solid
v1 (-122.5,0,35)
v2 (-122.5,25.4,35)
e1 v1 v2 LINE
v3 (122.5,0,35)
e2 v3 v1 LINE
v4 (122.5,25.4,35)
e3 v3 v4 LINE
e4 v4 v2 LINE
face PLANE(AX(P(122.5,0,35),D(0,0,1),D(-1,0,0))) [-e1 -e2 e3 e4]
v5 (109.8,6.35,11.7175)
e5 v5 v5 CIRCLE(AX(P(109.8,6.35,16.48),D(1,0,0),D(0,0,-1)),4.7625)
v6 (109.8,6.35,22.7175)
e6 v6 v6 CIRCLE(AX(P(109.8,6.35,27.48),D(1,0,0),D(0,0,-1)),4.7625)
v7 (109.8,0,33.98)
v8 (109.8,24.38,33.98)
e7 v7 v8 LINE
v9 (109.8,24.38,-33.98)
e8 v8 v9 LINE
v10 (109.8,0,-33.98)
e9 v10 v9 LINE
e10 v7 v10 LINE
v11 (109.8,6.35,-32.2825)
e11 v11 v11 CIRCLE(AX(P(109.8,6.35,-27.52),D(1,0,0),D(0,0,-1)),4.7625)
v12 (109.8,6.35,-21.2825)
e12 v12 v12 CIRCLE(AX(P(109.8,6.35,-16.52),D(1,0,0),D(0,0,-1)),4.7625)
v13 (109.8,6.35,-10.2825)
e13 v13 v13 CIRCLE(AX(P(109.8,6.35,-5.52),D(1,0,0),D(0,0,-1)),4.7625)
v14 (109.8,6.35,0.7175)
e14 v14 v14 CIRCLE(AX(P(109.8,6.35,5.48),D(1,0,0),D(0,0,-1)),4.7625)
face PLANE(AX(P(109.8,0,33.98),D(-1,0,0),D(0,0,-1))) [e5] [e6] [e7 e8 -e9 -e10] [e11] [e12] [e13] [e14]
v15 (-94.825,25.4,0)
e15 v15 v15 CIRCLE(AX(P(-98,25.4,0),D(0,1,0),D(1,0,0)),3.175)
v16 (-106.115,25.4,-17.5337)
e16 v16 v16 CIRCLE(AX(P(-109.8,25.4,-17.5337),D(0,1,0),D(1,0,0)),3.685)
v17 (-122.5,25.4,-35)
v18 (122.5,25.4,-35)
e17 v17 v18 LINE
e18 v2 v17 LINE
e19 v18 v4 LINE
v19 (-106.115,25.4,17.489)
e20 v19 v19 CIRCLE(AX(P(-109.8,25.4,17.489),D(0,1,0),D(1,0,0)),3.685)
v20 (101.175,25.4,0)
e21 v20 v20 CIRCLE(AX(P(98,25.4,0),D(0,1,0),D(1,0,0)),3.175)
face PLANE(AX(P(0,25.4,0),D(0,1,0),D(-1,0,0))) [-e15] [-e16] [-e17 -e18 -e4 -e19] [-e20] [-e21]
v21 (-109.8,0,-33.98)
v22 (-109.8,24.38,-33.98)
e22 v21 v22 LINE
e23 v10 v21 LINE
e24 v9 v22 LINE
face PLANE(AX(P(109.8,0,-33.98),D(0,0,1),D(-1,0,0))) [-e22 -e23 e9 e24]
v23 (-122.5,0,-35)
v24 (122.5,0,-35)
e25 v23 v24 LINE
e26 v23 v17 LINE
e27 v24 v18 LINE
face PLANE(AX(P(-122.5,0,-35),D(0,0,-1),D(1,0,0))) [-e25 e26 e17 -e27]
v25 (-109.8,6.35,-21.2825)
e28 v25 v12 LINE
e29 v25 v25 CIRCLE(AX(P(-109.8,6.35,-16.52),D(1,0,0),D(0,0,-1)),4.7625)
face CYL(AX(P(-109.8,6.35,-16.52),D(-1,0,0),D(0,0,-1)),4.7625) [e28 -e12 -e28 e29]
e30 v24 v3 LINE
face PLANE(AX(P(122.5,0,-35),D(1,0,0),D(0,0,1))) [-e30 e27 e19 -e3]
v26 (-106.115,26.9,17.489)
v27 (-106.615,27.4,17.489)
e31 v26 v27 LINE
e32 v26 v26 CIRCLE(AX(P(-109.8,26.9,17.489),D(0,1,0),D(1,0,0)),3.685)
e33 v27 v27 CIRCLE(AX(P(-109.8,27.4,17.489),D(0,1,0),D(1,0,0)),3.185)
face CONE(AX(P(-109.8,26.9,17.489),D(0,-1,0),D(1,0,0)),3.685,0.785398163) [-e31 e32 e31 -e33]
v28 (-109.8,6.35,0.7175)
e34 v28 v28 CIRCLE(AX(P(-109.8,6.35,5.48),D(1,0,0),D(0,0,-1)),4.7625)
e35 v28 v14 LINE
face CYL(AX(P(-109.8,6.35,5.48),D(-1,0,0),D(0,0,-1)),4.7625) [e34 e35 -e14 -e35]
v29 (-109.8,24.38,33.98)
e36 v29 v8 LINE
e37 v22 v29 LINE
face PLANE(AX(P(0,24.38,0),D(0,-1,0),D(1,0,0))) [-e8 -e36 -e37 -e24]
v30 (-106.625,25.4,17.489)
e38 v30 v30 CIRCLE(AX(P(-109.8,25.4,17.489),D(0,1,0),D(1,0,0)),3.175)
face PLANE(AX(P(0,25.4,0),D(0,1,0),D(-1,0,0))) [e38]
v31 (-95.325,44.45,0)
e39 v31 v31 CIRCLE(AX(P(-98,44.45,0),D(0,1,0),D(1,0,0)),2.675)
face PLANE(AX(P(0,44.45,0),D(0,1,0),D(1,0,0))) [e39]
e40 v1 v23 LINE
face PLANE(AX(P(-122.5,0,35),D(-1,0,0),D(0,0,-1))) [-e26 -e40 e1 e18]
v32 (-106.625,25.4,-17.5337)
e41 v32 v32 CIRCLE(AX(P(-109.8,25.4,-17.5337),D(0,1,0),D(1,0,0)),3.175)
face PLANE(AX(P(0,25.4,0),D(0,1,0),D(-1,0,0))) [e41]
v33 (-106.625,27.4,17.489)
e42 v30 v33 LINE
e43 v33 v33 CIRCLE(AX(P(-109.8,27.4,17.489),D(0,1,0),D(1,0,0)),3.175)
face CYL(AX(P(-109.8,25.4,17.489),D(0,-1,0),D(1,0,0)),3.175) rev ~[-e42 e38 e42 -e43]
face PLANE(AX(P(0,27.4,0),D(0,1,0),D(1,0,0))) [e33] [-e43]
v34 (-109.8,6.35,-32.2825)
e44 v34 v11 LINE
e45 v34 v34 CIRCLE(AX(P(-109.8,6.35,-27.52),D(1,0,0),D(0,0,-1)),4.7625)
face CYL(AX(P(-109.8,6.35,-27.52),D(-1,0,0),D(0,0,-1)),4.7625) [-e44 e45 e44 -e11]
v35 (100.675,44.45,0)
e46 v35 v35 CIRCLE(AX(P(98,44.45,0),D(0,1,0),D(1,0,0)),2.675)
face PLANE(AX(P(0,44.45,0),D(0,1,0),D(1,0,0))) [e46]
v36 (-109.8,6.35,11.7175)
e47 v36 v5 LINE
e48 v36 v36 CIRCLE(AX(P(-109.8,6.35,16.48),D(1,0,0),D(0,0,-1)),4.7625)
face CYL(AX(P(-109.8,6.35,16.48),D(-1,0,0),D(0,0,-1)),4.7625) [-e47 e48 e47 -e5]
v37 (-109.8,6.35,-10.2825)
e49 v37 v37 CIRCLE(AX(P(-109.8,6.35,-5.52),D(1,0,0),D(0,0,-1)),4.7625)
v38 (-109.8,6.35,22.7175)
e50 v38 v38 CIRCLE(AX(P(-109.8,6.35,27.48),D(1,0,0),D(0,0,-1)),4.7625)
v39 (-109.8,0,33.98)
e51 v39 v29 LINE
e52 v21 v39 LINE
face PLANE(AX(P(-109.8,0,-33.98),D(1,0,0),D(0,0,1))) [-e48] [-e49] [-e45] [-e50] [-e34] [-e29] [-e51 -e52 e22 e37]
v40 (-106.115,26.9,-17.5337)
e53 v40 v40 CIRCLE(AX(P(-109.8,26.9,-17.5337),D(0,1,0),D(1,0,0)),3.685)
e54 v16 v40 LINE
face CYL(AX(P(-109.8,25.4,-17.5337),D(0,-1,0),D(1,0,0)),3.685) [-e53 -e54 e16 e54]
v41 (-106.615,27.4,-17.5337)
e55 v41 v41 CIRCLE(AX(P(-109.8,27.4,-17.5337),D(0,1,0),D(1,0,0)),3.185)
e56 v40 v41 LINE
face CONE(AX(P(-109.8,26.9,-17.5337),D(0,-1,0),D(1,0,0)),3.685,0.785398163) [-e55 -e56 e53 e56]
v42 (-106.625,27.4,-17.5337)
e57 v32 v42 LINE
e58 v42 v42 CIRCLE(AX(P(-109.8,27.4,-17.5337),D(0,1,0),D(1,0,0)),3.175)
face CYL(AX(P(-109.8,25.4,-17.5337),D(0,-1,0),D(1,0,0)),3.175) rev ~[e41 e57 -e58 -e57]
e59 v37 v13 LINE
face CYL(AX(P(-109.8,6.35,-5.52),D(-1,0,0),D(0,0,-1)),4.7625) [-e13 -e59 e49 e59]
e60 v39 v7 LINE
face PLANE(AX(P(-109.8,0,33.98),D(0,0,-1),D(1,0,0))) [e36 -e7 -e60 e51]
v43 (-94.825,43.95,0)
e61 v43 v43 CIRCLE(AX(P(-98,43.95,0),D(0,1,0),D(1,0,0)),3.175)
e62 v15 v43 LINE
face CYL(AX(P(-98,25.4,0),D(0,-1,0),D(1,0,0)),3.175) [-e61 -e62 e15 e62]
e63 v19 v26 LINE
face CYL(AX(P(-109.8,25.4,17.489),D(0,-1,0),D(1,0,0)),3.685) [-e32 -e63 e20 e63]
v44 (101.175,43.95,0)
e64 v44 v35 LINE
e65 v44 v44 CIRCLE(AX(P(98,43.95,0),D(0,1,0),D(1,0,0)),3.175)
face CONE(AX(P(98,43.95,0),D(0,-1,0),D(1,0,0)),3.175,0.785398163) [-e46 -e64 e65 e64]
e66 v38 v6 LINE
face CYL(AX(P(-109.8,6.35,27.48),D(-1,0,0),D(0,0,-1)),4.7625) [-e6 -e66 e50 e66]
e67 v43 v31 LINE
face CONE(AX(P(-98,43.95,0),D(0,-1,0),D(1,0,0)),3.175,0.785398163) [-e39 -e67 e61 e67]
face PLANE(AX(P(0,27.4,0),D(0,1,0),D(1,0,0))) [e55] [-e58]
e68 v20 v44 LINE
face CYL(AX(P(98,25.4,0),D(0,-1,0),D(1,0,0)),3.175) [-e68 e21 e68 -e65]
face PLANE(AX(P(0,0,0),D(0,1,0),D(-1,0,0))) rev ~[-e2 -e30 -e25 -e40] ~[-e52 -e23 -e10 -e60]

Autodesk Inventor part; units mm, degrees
ref_plane "YZ Plane" through (0, 0, 0) normal (1, 0, 0) x (0, 1, 0)
ref_plane "XZ Plane" through (0, 0, 0) normal (0, 1, 0) x (-1, 0, 0)
ref_plane "XY Plane" through (0, 0, 0) normal (0, 0, 1) x (1, 0, 0)
sketch "Boceto1" plane through (0, 0, 0) normal (0, 1, 0) x (-1, 0, 0)
  line L0 (-122.5, 35) -> (122.5, 35)
  line L1 (122.5, 35) -> (122.5, -35)
  line L2 (122.5, -35) -> (-122.5, -35)
  line L3 (-122.5, -35) -> (-122.5, 35)
  line L4 (-122.5, 35) -> (122.5, -35) construction
  line L5 (122.5, 35) -> (-122.5, -35) construction
  point P0 (0, 0)
  dimension "d0" = 245
  dimension "d1" = 70
extrude "Extrusión1" add sketch "Boceto1" along normal blind 25.4
sketch "Boceto2" plane through (0, 0, 0) normal (0, -1, 0) x (1, 0, 0)
  line L0 (-109.8, 33.98) -> (109.8, 33.98)
  line L1 (109.8, -33.98) -> (-109.8, -33.98)
  line L2 (-109.8, -33.98) -> (-109.8, 33.98)
  line L3 (109.8, 33.98) -> (109.8, -33.98)
  line L4 (-122.5, -35) -> (-122.5, 35) projected
  line L5 (-122.5, 35) -> (122.5, 35) projected
  dimension "d8" = 12.7
  dimension "d9" = 1.02
extrude "Extrusión2" cut sketch "Boceto2" against normal blind 24.38
sketch "Boceto3" plane through (-109.8, 0, 33.98) normal (1, 0, 0) x (0, 0, -1)
  line L0 (-1.02, 0) -> (-1.02, 25.4) construction
  line L1 (68.98, 0) -> (68.98, 25.4) construction
  circle A0 centre (6.5, 6.35) radius 4.7625
  line L2 (0, 0) -> (0, 24.38) projected
  line L3 (67.96, 0) -> (0, 0) projected
  circle A1 centre (17.5, 6.35) radius 4.7625
  circle A2 centre (28.5, 6.35) radius 4.7625
  circle A3 centre (39.5, 6.35) radius 4.7625
  circle A4 centre (50.5, 6.35) radius 4.7625
  circle A5 centre (61.5, 6.35) radius 4.7625
  point P0 (33.98, 0)
  dimension "d12" = 9.525
  dimension "d13" = 6.5
  dimension "d14" = 6.35
  dimension "d17" = 11
extrude "Extrusión3" add sketch "Boceto3" along normal up to surface (219.6 mm away)
sketch "Boceto4" plane through (0, 25.4, 0) normal (0, 1, 0) x (1, 0, 0)
  line L0 (-122.5, 35) -> (-73.5, 35) construction
  line L1 (-73.5, 35) -> (-73.5, -35) construction
  line L2 (-122.5, -35) -> (122.5, -35) construction
  line L3 (-122.5, -35) -> (-73.5, 35) construction
  line L4 (-122.5, 35) -> (-73.5, -35) construction
  line L5 (122.5, 35) -> (-122.5, 35) construction
  line L6 (122.5, 35) -> (73.5, 35) construction
  line L7 (73.5, 35) -> (73.5, -35) construction
  line L8 (73.5, -35) -> (122.5, 35) construction
  line L9 (73.5, 35) -> (122.5, -35) construction
  circle A0 centre (-98, 0) radius 3.175
  circle A1 centre (98, 0) radius 3.175
  point P0 (0, 0)
  dimension "d24" = 49
  dimension "d25" = 49
  dimension "d26" = 6.35
  dimension "d27" = 6.35
extrude "Extrusión4" add sketch "Boceto4" along normal blind 19.05
thread "Rosca1" size "1/4-20 UNC" class "1A" standard "ANSI Unified Screw Threads" full length
thread "Rosca2" size "M7x1" class "6g" standard "ANSI Metric M Profile" full length
chamfer "Chaflán1" distance 0.5 angle 45 1 edges at (-101.175, 44.45, 0)
chamfer "Chaflán2" distance 0.5 angle 45 1 edges at (94.825, 44.45, 0)
sketch "Boceto5" plane through (0, 25.4, 0) normal (0, 1, 0) x (1, 0, 0)
  line L0 (-122.5, -35) -> (122.5, -35) construction
  line L1 (-109.8, -35) -> (-109.8, 35.0447) construction
  line L2 (-122.5, 35) -> (-122.5, -35) construction
  line L3 (-109.8, -35) -> (-109.8, -17.489) construction
  line L4 (-109.8, -11.7175) -> (-109.8, -21.2425) construction
  line L5 (-109.8, 35.0447) -> (-109.8, 17.5337) construction
  line L6 (-109.8, 33.98) -> (-109.8, -33.98) construction
  circle A0 centre (-109.8, -17.489) radius 3.175
  circle A1 centre (-109.8, 17.5337) radius 3.175
  circle A2 centre (-109.8, -17.489) radius 3.685
  circle A3 centre (-109.8, 17.5337) radius 3.685
  point P0 (0, 0)
  dimension "d40" = 12.7
  dimension "d41" = 17.511
  dimension "d42" = 17.511
  dimension "d43" = 6.35
  dimension "d44" = 6.35
  dimension "d45" = 7.37
  dimension "d46" = 7.37
extrude "Extrusión5" add sketch "Boceto5" along normal blind 2
chamfer "Chaflán3" distance 0.5 angle 45 2 edges at (-113.485, 27.4, -17.5337) (-113.485, 27.4, 17.489)
sketch "Boceto6" plane through (-109.8, 25.4, 17.489) normal (0, 1, 0) x (1, 0, 0)
  circle A0 centre (0, 0) radius 3.175 projected
sketch "Boceto7" plane through (-109.8, 25.4, -17.5337) normal (0, 1, 0) x (1, 0, 0)
  circle A0 centre (0, 0) radius 3.175 projected
properties part number "resistencia_cuarzo_250-300W"
